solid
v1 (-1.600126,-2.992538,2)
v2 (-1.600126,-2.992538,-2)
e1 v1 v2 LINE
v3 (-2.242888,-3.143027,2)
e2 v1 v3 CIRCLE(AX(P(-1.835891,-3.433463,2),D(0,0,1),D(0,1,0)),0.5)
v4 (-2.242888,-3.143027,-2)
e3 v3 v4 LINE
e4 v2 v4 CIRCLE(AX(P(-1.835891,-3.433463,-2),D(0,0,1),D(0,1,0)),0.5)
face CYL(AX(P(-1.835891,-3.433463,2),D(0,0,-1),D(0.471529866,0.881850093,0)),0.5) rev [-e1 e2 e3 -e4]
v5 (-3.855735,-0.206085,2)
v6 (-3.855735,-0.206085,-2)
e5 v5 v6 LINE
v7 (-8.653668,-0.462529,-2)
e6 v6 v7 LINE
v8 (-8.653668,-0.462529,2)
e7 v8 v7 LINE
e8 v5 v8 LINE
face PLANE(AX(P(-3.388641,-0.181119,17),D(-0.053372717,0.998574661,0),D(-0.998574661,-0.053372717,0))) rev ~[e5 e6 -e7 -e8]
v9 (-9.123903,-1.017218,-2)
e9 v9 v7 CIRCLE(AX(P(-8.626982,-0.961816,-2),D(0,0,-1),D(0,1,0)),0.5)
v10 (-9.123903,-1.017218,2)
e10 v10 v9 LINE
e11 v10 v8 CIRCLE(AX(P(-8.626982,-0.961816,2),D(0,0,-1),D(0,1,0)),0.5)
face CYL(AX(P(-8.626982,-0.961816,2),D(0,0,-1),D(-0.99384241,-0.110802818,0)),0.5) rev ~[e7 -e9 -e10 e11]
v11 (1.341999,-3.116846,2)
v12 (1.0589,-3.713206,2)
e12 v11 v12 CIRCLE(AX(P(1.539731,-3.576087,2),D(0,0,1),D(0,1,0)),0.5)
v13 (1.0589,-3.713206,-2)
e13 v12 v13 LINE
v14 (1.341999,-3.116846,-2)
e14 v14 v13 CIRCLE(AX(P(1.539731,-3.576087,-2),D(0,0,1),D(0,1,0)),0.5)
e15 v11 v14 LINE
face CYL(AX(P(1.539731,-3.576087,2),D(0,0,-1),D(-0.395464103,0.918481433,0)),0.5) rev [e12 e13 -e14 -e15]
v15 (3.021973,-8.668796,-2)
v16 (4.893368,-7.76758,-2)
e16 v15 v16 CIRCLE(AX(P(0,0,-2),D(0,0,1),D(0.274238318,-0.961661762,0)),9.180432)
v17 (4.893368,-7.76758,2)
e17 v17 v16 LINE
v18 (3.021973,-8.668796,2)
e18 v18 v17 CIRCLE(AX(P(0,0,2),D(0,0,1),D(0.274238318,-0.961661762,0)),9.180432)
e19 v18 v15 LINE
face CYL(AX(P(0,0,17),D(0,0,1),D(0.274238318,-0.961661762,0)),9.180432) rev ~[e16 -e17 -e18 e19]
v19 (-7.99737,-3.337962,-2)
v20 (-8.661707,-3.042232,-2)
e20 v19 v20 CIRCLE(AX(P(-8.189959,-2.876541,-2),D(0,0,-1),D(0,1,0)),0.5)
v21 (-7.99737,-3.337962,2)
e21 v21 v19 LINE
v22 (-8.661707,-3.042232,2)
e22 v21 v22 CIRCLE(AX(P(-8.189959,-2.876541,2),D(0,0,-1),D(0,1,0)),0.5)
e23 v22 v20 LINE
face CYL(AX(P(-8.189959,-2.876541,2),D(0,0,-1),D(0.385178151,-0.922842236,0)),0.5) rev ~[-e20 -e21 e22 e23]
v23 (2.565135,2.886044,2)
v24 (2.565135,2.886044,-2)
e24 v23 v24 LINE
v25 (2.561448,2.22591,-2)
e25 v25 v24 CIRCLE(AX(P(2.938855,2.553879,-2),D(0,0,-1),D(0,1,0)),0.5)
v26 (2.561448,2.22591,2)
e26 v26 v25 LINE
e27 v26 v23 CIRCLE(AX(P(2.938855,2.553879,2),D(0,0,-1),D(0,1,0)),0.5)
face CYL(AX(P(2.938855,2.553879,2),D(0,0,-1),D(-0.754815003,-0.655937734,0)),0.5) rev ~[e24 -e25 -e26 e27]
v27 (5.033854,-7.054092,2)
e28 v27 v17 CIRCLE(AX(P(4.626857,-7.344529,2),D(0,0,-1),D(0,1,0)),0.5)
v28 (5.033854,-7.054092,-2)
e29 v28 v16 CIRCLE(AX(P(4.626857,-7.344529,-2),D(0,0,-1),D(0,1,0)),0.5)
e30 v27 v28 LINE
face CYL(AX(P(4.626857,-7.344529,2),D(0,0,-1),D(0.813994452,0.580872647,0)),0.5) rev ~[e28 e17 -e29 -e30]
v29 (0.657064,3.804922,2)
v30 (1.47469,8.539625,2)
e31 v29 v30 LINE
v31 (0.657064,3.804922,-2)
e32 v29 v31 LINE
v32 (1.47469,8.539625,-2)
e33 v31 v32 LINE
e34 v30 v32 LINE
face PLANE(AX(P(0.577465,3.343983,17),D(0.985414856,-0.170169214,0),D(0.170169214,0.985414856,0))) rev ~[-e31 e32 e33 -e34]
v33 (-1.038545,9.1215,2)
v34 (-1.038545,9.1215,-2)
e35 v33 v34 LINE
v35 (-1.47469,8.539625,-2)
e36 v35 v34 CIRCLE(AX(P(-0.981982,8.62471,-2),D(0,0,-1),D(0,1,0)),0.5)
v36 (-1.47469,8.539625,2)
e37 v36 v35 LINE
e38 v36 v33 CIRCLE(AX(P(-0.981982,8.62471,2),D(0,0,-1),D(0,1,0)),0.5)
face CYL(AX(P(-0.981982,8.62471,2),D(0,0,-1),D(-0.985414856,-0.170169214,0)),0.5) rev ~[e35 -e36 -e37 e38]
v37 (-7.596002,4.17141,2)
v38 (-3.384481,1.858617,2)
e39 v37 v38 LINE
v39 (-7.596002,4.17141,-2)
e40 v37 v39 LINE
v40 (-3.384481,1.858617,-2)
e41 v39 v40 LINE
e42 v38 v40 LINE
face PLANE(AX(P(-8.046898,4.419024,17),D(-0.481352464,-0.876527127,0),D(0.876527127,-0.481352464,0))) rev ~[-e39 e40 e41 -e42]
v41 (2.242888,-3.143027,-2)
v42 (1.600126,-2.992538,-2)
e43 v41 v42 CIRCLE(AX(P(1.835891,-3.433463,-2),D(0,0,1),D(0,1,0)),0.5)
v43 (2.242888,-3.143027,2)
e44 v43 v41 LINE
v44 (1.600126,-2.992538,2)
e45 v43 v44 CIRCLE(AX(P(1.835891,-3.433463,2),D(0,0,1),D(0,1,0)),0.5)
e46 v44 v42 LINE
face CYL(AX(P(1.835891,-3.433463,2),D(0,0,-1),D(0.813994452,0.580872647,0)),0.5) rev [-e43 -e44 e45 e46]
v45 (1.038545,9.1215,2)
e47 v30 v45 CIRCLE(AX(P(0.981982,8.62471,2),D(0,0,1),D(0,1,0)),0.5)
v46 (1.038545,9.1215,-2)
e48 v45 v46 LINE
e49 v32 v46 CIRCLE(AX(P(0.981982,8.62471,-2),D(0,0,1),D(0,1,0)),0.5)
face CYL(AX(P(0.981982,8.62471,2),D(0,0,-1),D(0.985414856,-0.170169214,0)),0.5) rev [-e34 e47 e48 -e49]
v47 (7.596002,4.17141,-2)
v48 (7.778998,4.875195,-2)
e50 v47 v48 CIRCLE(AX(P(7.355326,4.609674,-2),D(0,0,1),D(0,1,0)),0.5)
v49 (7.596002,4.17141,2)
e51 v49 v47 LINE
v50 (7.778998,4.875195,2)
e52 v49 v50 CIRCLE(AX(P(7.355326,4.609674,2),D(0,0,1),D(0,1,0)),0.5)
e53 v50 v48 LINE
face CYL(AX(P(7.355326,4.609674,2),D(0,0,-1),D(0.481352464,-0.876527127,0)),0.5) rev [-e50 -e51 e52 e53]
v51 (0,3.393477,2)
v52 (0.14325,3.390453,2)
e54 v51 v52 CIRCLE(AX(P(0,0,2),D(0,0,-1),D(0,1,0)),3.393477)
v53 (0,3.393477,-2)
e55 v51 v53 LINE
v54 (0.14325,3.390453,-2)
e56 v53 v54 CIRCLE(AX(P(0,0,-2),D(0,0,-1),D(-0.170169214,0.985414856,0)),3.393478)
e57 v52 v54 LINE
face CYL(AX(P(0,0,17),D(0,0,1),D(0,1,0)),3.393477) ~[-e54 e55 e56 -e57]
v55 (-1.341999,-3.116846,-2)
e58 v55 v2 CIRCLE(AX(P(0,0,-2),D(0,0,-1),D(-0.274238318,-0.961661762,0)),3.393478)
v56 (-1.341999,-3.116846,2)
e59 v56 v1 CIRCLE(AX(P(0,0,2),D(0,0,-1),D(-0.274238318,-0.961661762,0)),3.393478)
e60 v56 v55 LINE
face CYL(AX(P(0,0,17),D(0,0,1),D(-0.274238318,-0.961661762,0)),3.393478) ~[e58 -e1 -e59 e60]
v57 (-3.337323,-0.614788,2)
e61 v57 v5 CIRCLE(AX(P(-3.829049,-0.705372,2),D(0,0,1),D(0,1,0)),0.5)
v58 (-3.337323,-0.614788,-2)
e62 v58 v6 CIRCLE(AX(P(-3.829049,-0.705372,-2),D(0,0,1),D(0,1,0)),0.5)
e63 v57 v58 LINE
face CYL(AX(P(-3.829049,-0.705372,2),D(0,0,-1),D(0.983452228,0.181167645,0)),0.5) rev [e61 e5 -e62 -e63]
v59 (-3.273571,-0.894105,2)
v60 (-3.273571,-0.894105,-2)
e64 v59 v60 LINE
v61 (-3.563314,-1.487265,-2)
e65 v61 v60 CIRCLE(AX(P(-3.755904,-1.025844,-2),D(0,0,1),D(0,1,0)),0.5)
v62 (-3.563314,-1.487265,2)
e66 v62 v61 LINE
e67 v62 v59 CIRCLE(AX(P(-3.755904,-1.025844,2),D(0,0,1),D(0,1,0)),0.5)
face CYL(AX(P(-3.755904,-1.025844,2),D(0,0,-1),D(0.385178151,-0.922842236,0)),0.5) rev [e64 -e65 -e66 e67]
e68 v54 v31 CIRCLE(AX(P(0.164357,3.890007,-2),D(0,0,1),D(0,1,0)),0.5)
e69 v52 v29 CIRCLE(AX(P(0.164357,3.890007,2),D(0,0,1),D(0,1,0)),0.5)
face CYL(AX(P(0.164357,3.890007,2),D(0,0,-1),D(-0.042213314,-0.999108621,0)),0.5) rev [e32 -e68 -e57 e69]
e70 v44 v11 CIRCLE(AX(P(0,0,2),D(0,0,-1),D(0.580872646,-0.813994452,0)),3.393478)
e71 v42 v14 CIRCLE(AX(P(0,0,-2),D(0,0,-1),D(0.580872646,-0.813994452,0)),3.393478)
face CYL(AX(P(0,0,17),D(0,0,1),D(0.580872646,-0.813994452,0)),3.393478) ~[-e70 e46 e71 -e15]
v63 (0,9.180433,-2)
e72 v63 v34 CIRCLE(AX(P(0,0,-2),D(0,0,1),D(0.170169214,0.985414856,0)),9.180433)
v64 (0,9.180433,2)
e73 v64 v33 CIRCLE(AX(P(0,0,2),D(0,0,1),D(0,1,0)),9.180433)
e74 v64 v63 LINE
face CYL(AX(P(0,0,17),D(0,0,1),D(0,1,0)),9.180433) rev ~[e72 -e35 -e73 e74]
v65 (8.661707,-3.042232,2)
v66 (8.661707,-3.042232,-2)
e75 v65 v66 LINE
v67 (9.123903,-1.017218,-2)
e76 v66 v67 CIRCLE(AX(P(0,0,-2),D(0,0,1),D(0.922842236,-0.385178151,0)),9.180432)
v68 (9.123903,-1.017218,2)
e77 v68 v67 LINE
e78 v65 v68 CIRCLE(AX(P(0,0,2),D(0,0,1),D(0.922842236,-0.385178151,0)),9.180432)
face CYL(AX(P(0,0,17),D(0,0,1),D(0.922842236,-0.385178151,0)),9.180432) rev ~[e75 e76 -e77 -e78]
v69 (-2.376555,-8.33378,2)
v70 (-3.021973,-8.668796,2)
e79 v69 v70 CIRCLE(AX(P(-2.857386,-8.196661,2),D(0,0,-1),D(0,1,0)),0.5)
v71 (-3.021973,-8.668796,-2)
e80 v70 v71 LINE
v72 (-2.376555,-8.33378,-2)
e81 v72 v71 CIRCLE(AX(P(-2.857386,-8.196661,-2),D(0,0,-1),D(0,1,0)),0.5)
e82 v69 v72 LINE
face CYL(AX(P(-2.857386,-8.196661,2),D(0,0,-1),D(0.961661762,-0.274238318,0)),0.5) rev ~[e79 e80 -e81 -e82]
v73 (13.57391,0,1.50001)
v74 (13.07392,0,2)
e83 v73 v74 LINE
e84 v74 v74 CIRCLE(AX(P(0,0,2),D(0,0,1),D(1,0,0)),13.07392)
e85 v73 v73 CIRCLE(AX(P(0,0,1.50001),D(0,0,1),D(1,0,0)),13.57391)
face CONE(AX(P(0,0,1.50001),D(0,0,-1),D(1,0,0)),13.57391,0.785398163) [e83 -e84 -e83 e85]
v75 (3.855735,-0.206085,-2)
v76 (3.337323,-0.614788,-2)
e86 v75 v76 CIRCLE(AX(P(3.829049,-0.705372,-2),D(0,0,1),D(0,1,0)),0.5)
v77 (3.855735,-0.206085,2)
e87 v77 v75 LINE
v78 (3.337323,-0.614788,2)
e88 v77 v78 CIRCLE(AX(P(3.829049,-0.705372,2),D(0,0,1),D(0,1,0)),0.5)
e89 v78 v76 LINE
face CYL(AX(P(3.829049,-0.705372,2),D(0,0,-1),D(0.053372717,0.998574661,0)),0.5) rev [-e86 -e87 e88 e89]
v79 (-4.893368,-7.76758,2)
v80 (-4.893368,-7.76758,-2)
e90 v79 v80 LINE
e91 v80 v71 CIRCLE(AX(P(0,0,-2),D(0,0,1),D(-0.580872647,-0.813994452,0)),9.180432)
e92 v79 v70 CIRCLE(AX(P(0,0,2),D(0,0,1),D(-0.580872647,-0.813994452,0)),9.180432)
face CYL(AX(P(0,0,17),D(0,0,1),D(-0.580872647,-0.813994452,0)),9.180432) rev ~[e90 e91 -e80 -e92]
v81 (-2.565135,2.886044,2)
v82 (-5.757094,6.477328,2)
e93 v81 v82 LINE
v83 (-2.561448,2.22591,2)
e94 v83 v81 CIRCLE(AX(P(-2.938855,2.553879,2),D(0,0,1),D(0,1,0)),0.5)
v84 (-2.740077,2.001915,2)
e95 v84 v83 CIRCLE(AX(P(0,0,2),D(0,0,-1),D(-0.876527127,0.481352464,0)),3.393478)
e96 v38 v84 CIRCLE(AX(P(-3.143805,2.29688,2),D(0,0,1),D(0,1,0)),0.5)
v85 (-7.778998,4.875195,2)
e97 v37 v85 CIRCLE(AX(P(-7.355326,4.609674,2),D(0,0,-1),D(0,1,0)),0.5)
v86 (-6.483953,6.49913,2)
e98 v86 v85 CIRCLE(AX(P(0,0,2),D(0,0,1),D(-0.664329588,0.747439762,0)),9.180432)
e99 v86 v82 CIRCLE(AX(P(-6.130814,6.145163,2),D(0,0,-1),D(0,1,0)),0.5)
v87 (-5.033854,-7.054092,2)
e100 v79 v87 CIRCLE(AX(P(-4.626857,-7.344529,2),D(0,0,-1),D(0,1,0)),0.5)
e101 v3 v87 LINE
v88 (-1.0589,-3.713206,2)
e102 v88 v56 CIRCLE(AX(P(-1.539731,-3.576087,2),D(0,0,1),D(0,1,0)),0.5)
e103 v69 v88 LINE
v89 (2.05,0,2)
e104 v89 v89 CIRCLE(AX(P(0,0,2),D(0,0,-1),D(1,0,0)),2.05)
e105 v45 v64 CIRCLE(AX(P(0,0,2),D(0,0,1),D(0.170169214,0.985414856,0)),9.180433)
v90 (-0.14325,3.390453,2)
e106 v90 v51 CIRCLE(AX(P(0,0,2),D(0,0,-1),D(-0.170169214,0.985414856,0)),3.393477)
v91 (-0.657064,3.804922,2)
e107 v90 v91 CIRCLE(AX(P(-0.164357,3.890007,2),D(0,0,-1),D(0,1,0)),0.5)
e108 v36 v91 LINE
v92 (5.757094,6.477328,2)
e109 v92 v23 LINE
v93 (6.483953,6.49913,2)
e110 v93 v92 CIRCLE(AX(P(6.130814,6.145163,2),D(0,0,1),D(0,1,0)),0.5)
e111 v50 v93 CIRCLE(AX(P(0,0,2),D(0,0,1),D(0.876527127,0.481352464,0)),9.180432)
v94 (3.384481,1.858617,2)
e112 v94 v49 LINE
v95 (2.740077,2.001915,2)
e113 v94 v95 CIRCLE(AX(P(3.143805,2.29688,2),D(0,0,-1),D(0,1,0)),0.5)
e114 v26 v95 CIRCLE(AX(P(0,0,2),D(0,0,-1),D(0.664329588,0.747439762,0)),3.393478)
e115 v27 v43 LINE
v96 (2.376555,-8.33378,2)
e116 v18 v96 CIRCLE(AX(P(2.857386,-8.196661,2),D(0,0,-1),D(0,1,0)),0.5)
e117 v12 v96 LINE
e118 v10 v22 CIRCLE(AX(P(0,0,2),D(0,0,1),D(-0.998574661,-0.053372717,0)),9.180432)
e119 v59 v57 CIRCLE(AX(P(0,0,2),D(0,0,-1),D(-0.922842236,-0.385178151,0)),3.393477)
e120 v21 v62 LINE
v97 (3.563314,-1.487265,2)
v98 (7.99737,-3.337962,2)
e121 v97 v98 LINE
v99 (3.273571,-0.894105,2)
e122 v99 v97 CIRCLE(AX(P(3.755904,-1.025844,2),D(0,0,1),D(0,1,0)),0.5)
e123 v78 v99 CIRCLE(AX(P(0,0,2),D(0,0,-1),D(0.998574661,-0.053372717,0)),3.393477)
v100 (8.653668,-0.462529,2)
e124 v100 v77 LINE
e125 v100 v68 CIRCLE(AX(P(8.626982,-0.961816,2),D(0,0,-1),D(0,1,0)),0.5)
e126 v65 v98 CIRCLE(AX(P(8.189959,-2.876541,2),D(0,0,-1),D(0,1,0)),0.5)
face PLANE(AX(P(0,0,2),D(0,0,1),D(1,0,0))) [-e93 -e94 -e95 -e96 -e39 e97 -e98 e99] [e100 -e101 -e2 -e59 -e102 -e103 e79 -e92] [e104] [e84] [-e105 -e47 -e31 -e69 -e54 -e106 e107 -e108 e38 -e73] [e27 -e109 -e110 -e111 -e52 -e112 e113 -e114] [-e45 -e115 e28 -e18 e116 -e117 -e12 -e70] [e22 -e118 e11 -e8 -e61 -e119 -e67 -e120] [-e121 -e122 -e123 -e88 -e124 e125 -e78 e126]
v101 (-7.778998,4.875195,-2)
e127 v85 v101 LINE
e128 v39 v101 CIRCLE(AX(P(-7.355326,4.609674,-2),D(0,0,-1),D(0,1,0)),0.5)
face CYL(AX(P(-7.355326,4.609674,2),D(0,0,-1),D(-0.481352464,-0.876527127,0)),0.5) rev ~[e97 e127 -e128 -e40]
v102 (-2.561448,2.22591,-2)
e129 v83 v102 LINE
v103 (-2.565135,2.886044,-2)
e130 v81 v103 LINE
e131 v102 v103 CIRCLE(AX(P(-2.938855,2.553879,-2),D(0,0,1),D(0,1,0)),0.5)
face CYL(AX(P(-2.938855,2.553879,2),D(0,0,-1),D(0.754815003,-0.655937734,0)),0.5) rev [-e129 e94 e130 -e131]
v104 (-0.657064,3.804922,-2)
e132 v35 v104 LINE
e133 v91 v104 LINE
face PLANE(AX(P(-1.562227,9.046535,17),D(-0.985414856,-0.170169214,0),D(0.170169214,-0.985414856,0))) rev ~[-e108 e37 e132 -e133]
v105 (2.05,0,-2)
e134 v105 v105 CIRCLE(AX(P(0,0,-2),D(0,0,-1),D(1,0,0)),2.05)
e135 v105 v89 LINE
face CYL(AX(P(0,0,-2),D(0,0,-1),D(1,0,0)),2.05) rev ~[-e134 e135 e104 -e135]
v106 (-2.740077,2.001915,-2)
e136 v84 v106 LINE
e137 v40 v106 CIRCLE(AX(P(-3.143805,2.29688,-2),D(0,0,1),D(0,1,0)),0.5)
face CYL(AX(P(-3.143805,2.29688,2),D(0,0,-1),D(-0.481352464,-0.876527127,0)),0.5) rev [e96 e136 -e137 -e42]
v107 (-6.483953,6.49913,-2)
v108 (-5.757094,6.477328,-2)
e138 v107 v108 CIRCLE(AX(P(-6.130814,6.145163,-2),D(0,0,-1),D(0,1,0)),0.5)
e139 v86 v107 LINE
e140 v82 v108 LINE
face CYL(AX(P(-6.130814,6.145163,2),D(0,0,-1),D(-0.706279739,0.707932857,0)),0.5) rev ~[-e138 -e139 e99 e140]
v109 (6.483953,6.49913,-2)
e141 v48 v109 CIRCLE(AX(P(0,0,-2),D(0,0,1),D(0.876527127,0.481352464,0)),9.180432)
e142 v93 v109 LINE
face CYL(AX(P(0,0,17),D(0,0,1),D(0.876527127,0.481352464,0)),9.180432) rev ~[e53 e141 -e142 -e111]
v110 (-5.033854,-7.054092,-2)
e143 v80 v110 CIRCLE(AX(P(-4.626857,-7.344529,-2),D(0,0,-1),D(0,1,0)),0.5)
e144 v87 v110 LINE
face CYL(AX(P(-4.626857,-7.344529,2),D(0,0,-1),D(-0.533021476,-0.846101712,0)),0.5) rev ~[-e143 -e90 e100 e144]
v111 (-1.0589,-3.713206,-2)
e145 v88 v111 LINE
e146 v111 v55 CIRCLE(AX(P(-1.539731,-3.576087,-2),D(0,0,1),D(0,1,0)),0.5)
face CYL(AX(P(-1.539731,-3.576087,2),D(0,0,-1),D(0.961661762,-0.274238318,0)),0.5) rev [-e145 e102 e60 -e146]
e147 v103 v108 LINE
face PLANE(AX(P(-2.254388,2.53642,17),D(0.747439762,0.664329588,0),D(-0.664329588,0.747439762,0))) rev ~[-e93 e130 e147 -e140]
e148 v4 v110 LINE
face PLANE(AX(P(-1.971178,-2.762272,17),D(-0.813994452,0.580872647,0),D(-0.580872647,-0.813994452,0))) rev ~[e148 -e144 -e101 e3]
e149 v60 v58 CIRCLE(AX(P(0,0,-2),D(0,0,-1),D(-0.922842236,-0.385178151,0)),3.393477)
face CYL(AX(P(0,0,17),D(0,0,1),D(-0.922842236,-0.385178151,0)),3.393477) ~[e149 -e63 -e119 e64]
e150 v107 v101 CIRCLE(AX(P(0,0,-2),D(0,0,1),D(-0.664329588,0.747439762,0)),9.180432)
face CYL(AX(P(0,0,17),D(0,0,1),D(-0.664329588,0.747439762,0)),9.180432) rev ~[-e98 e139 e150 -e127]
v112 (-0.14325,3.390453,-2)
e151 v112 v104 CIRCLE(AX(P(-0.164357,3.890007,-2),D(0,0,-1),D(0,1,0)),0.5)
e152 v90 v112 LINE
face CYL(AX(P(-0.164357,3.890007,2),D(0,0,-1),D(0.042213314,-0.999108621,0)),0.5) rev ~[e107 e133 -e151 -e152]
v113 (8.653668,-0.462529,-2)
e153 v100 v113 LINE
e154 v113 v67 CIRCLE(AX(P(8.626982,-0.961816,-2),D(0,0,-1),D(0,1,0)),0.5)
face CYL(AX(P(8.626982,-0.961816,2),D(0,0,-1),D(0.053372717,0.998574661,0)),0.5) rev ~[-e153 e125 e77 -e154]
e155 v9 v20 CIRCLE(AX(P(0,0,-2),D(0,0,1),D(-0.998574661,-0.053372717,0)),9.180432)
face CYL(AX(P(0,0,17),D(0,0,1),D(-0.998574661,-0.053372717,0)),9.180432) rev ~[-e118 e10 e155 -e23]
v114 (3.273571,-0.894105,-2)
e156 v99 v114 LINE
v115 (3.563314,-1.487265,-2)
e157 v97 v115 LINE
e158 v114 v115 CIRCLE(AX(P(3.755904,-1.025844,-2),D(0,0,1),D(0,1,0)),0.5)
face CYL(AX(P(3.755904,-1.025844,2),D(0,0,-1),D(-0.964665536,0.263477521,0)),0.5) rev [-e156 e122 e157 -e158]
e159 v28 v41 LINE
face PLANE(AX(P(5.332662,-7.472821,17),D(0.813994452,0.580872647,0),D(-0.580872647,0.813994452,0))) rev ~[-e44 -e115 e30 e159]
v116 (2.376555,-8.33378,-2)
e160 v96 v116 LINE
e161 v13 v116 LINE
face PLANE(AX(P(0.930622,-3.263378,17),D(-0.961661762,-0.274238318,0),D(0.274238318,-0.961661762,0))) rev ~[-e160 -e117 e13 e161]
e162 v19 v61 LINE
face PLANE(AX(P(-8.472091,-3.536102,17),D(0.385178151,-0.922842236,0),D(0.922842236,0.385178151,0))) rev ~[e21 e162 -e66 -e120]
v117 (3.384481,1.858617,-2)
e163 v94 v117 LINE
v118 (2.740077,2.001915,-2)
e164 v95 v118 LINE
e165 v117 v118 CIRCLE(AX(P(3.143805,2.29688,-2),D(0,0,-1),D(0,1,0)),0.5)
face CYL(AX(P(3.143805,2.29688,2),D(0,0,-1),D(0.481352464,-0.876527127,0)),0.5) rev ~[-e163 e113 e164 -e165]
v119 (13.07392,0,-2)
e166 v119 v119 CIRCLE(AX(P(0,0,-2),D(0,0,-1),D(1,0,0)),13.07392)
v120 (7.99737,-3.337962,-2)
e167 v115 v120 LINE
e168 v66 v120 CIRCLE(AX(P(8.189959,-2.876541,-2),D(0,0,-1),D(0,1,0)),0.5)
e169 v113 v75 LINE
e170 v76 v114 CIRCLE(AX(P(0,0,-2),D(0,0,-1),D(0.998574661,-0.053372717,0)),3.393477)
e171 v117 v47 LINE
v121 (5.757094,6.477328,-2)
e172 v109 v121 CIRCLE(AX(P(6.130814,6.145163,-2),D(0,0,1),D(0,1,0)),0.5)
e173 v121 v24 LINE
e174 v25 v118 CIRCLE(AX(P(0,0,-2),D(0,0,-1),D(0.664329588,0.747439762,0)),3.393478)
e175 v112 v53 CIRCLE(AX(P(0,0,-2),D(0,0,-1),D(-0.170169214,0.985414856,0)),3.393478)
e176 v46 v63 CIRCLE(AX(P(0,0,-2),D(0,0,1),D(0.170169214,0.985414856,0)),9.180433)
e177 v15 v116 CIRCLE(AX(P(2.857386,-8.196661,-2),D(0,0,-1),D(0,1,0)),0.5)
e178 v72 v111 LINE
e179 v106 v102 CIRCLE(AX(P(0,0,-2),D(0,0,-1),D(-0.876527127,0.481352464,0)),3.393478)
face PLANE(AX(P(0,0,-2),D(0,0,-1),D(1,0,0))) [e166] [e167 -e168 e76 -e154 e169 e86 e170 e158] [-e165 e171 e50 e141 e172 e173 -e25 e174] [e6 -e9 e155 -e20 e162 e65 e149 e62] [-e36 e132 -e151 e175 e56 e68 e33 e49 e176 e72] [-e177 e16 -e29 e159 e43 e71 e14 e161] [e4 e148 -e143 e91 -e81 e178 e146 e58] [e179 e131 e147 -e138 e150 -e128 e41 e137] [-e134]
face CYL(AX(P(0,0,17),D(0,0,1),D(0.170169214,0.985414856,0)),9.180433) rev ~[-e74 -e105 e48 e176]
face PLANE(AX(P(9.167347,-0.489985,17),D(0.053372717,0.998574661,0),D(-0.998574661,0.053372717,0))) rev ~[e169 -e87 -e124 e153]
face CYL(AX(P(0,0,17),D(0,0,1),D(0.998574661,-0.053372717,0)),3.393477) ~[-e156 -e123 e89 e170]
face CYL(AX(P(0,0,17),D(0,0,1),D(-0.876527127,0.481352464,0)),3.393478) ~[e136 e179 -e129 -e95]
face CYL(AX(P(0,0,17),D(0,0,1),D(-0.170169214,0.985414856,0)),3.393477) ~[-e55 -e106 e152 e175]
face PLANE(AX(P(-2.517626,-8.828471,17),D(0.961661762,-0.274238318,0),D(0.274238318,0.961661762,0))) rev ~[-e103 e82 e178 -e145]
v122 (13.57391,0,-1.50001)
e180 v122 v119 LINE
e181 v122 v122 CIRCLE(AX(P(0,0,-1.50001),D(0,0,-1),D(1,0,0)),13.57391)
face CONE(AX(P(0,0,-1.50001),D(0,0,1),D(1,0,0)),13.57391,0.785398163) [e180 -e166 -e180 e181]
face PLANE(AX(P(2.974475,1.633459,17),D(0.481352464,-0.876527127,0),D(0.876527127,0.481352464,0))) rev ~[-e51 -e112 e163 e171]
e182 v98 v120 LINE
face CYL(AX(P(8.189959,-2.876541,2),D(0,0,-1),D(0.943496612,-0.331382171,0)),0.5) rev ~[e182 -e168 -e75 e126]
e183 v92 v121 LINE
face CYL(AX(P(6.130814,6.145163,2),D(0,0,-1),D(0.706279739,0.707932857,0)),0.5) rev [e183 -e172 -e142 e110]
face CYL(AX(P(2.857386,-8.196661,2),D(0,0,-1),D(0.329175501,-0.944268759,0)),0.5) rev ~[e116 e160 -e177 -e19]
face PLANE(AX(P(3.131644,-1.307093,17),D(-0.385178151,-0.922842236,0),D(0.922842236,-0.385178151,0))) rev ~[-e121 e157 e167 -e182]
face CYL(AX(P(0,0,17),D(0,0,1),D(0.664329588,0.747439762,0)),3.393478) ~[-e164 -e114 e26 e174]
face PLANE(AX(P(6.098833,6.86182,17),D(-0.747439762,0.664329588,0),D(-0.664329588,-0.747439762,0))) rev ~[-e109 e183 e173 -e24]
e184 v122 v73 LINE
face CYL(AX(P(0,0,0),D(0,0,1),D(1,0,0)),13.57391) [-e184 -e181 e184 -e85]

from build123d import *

# Parameters (mm, degrees)
F0_R      = 13.57391
F1_DEPTH  = 17
F3_DEPTH  = 1.5
F5_DEPTH  = 34
F6_R      = 15.57391
F6_R_2    = 13.57391
F7_DEPTH  = 1.5
F8_SIZE2  = 0.99999
F8_SIZE   = 1.99999
F9_R      = 1
F12_R     = 13.57391
F12_R_2   = 10.57391
F13_DEPTH = 2
F15_R     = 13.57391
F15_R_2   = 10.57391
F16_DEPTH = 2
F17_SIZE  = 0.49999
F18_R     = 19.7740128031
F18_R_2   = 13.57391
F19_DEPTH = 100
F20_DEPTH = 15
F10_R     = 13.57391
F10_R_2   = 10.32391
F21_DEPTH = 15
F22_R     = 2.05
F23_DEPTH = 25
F24_R     = 0.5


# Not quite as in the source:
# - a fillet or chamfer is up to 0.001 mm smaller than in the source, because OpenCascade refuses the exact size
# - a feature names something its author has since deleted; it is built from what else it names


with BuildPart() as f1:
    # F0 (on Top) → F1 (new body, symmetric)
    with BuildSketch(Plane.XY):
        Circle(F0_R)
    extrude(amount=F1_DEPTH, both=True)

    # F2 (on Top) → F3 (join, symmetric)
    with BuildSketch(Plane.XY):
        with BuildLine():
            Line((-8.8722387473, 10.27299432), (-13.094084175, 11.721231689))
            ThreePointArc((-13.094084175, 11.721231689), (-13.7398361081, 10.9571536638), (-14.3410637787, 10.1575687241))
            Line((-14.3410637787, 10.1575687241), (-11.9896877566, 6.3638369077))
            ThreePointArc((-11.9896877566, 6.3638369077), (-10.6125101782, 8.4631944563), (-8.8722387473, 10.27299432))
        make_face()
        with BuildLine():
            ThreePointArc((1, 17.5454356654), (0, 17.57391), (-1, 17.5454356654))
            Line((-1, 17.5454356654), (-2.5, 13.3417027657))
            ThreePointArc((-2.5, 13.3417027657), (0, 13.57391), (2.5, 13.3417027657))
            Line((2.5, 13.3417027657), (1, 17.5454356654))
        make_face()
        with BuildLine():
            Line((11.9896877566, 6.3638369077), (14.3410637787, 10.1575687241))
            ThreePointArc((14.3410637787, 10.1575687241), (13.7398361081, 10.9571536638), (13.094084175, 11.721231689))
            Line((13.094084175, 11.721231689), (8.8722387473, 10.27299432))
            ThreePointArc((8.8722387473, 10.27299432), (10.6125101782, 8.4631944563), (11.9896877566, 6.3638369077))
        make_face()
        with BuildLine():
            Line((12.4508960874, -5.4061279404), (16.8830140276, -4.8791546431))
            ThreePointArc((16.8830140276, -4.8791546431), (17.1332953852, -3.9105628665), (17.3280558955, -2.9292988187))
            Line((17.3280558955, -2.9292988187), (13.5635007572, -0.5314883795))
            ThreePointArc((13.5635007572, -0.5314883795), (13.2335837364, -3.0204791306), (12.4508960874, -5.4061279404))
        make_face()
        with BuildLine():
            Line((3.5363257124, -13.1051681845), (6.711710363, -16.2417750474))
            ThreePointArc((6.711710363, -16.2417750474), (7.6250337817, -15.8335457973), (8.5136480988, -15.3740075692))
            Line((8.5136480988, -15.3740075692), (8.0411700519, -10.9357494889))
            ThreePointArc((8.0411700519, -10.9357494889), (5.8894988252, -12.2296703257), (3.5363257124, -13.1051681845))
        make_face()
        with BuildLine():
            Line((-8.0411700519, -10.9357494889), (-8.5136480988, -15.3740075692))
            ThreePointArc((-8.5136480988, -15.3740075692), (-7.6250337817, -15.8335457973), (-6.711710363, -16.2417750474))
            Line((-6.711710363, -16.2417750474), (-3.5363257124, -13.1051681845))
            ThreePointArc((-3.5363257124, -13.1051681845), (-5.8894988252, -12.2296703257), (-8.0411700519, -10.9357494889))
        make_face()
        with BuildLine():
            Line((-13.5635007572, -0.5314883795), (-17.3280558955, -2.9292988187))
            ThreePointArc((-17.3280558955, -2.9292988187), (-17.1332953852, -3.9105628665), (-16.8830140276, -4.8791546431))
            Line((-16.8830140276, -4.8791546431), (-12.4508960874, -5.4061279404))
            ThreePointArc((-12.4508960874, -5.4061279404), (-13.2335837364, -3.0204791306), (-13.5635007572, -0.5314883795))
        make_face()
    extrude(amount=F3_DEPTH, both=True)

    # F4 (on face) → F5 (cut)
    with BuildSketch(Plane.XY.offset(17)):
        with BuildLine():
            ThreePointArc((-0.5774653997, 3.3439831422), (-0.2897912953, 3.3810812691), (0, 3.3934775))
            Line((0, 3.3934775), (0, 6.786955))
            Line((0, 6.786955), (0, 9.1804325))
            ThreePointArc((0, 9.1804325), (-0.7839773287, 9.1468967653), (-1.5622269849, 9.0465345705))
            Line((-1.5622269849, 9.0465345705), (-0.5774653997, 3.3439831422))
        make_face()
        with BuildLine():
            Line((0, 6.786955), (0, 3.3934775))
            ThreePointArc((0, 3.3934775), (0.2897912953, 3.3810812691), (0.5774653997, 3.3439831422))
            Line((0.5774653997, 3.3439831422), (1.5622269849, 9.0465345705))
            ThreePointArc((1.5622269849, 9.0465345705), (0.7839773287, 9.1468967653), (0, 9.1804325))
            Line((0, 9.1804325), (0, 6.786955))
        make_face()
        Polygon((-1.2990381057, 0.7133780277), (0, 0), (-0.8810810246, 0.9913076333), (-1.2990381057, 0.75), align=None)
        Polygon((-0.8810810246, 0.9913076333), (0, 0), (-0.2355474293, 1.3640066283), align=None)
        Polygon((-0.2355474293, 1.3640066283), (0, 0), (0, 1.5), align=None)
        Polygon((0, 1.5), (0, 0), (0.2355474293, 1.3640066283), align=None)
        Polygon((0.2355474293, 1.3640066283), (0, 0), (0.8810810246, 0.9913076333), align=None)
        Polygon((0.8810810246, 0.9913076333), (0, 0), (1.2990381057, 0.7133780277), (1.2990381057, 0.75), align=None)
        Polygon((1.2990381057, -0.5421957037), (0, 0), (0.7580809189, -1.0623217774), (1.2990381057, -0.75), align=None)
        Polygon((0.3672856493, -1.2879475315), (0, 0), (-0.3672856493, -1.2879475315), (0, -1.5), align=None)
        Polygon((-0.7580809189, -1.0623217774), (0, 0), (-1.2990381057, -0.5421957037), (-1.2990381057, -0.75), align=None)
        with BuildLine():
            Line((-8.0468981277, 4.4190238073), (-2.974475085, 1.6334587572))
            ThreePointArc((-2.974475085, 1.6334587572), (-2.6531275445, 2.1157986141), (-2.2543875098, 2.5364200163))
            Line((-2.2543875098, 2.5364200163), (-6.0988329412, 6.8618202864))
            ThreePointArc((-6.0988329412, 6.8618202864), (-7.1775511512, 5.7239060404), (-8.0468981277, 4.4190238073))
        make_face()
        with BuildLine():
            Line((6.0988329412, 6.8618202864), (2.2543875098, 2.5364200163))
            ThreePointArc((2.2543875098, 2.5364200163), (2.6531275445, 2.1157986141), (2.974475085, 1.6334587572))
            Line((2.974475085, 1.6334587572), (8.0468981277, 4.4190238073))
            ThreePointArc((8.0468981277, 4.4190238073), (7.1775511512, 5.7239060404), (6.0988329412, 6.8618202864))
        make_face()
        with BuildLine():
            Line((9.167347269, -0.489984629), (3.3886406432, -0.1811191154))
            ThreePointArc((3.3886406432, -0.1811191154), (3.3083959341, -0.7551197827), (3.1316443631, -1.3070933884))
            Line((3.1316443631, -1.3070933884), (8.4720908536, -3.5361020144))
            ThreePointArc((8.4720908536, -3.5361020144), (8.9502598902, -2.042838414), (9.167347269, -0.489984629))
        make_face()
        with BuildLine():
            Line((-8.4720908536, -3.5361020144), (-3.1316443631, -1.3070933884))
            ThreePointArc((-3.1316443631, -1.3070933884), (-3.3083959341, -0.7551197827), (-3.3886406432, -0.1811191154))
            Line((-3.3886406432, -0.1811191154), (-9.167347269, -0.489984629))
            ThreePointArc((-9.167347269, -0.489984629), (-8.9502598902, -2.042838414), (-8.4720908536, -3.5361020144))
        make_face()
        with BuildLine():
            Line((-2.5176263675, -8.8284708959), (-0.9306215619, -3.2633775527))
            ThreePointArc((-0.9306215619, -3.2633775527), (-1.4723747063, -3.0574175814), (-1.9711782567, -2.7622718591))
            Line((-1.9711782567, -2.7622718591), (-5.3326621235, -7.4728211249))
            ThreePointArc((-5.3326621235, -7.4728211249), (-3.9832403798, -8.2712838764), (-2.5176263675, -8.8284708959))
        make_face()
        with BuildLine():
            Line((5.3326621235, -7.4728211249), (1.9711782567, -2.7622718591))
            ThreePointArc((1.9711782567, -2.7622718591), (1.4723747063, -3.0574175814), (0.9306215619, -3.2633775527))
            Line((0.9306215619, -3.2633775527), (2.5176263675, -8.8284708959))
            ThreePointArc((2.5176263675, -8.8284708959), (3.9832403798, -8.2712838764), (5.3326621235, -7.4728211249))
        make_face()
    extrude(amount=-F5_DEPTH, mode=Mode.SUBTRACT)

    # F6 (on face) → F7 (join)
    with BuildSketch(Plane(origin=(0, 0, -17), x_dir=(1, 0, 0), z_dir=(0, 0, -1))):
        Circle(F6_R)
        Circle(F6_R_2, mode=Mode.SUBTRACT)
    extrude(amount=-F7_DEPTH)

    # F8 (size 2 and 1 in the source; OpenCascade refuses exactly that, so slightly less here)
    f8_edges = [f1.edges().sort_by_distance(p)[0] for p in [
        (-15.57391, 0, -15.5),
    ]]
    f8_side = f1.faces().sort_by_distance((-15.133413, 0, -15.5))[0]
    chamfer(f8_edges, length=F8_SIZE, length2=F8_SIZE2, reference=f8_side)

    # F9
    f9_edges = [f1.edges().sort_by_distance(p)[0] for p in [
        (14.341064, 10.157569, 0),
        (13.094084, 11.721232, 0),
        (1, 17.545436, 0),
        (-1, 17.545436, 0),
        (-13.094084, 11.721232, 0),
        (-14.341064, 10.157569, 0),
        (-17.328056, -2.929299, 0),
        (-16.883014, -4.879155, 0),
        (-8.513648, -15.374008, 0),
        (-6.71171, -16.241775, 0),
        (6.71171, -16.241775, 0),
        (8.513648, -15.374008, 0),
        (16.883014, -4.879155, 0),
        (17.328056, -2.929299, 0),
    ]]
    fillet(f9_edges, radius=F9_R)

    # F12 (on offset) → F13 (cut)
    with BuildSketch(Plane.XY.offset(2)):
        Circle(F12_R)
        Circle(F12_R_2, mode=Mode.SUBTRACT)
    extrude(amount=F13_DEPTH, mode=Mode.SUBTRACT)

    # F15 (on offset) → F16 (cut)
    with BuildSketch(Plane(origin=(0, 0, -2), x_dir=(1, 0, 0), z_dir=(0, 0, -1))):
        Circle(F15_R)
        Circle(F15_R_2, mode=Mode.SUBTRACT)
    extrude(amount=F16_DEPTH, mode=Mode.SUBTRACT)

    # F17 (size 0.5 in the source; OpenCascade refuses exactly that, so slightly less here)
    f17_edges = [f1.edges().sort_by_distance(p)[0] for p in [
        (-13.57391, 0, -4),
        (-13.57391, 0, -2),
        (-13.57391, 0, 2),
        (-13.57391, 0, 4),
    ]]
    chamfer(f17_edges, length=F17_SIZE)

    # F18 (on face) → F19 (cut)
    with BuildSketch(Plane.XY.offset(17)):
        Circle(F18_R)
        Circle(F18_R_2, mode=Mode.SUBTRACT)
    extrude(amount=-F19_DEPTH, mode=Mode.SUBTRACT)

    # F20 (cut): a face of the model
    f20_faces = [f1.faces().sort_by_distance(p)[0] for p in [
        (-13.1899818477, 0, 17),
    ]]
    extrude(f20_faces, amount=-F20_DEPTH, mode=Mode.SUBTRACT)

    # F10 (on face) → F21 (cut)
    with BuildSketch(Plane(origin=(0, 0, -17), x_dir=(1, 0, 0), z_dir=(0, 0, -1))):
        Circle(F10_R)
        Circle(F10_R_2, mode=Mode.SUBTRACT)
        Circle(F10_R_2)
        with BuildLine():
            Line((-2.2543875098, -2.5364200163), (-6.0988329412, -6.8618202864))
            ThreePointArc((-6.0988329412, -6.8618202864), (-7.1775511512, -5.7239060404), (-8.0468981277, -4.4190238073))
            Line((-8.0468981277, -4.4190238073), (-2.974475085, -1.6334587572))
            ThreePointArc((-2.974475085, -1.6334587572), (-2.6531275445, -2.1157986141), (-2.2543875098, -2.5364200163))
        make_face(mode=Mode.SUBTRACT)
        with BuildLine():
            ThreePointArc((-0.5774653997, -3.3439831422), (0, -3.3934775), (0.5774653997, -3.3439831422))
            Line((0.5774653997, -3.3439831422), (1.5622269849, -9.0465345705))
            ThreePointArc((1.5622269849, -9.0465345705), (0, -9.1804325), (-1.5622269849, -9.0465345705))
            Line((-1.5622269849, -9.0465345705), (-0.5774653997, -3.3439831422))
        make_face(mode=Mode.SUBTRACT)
        with BuildLine():
            ThreePointArc((8.0468981277, -4.4190238073), (7.1775511512, -5.7239060404), (6.0988329412, -6.8618202864))
            Line((6.0988329412, -6.8618202864), (2.2543875098, -2.5364200163))
            ThreePointArc((2.2543875098, -2.5364200163), (2.6531275445, -2.1157986141), (2.974475085, -1.6334587572))
            Line((2.974475085, -1.6334587572), (8.0468981277, -4.4190238073))
        make_face(mode=Mode.SUBTRACT)
        Polygon((-1.2990381057, -0.7133780277), (0, 0), (1.2990381057, -0.7133780277), (1.2990381057, -0.75), (0, -1.5), (-1.2990381057, -0.75), align=None, mode=Mode.SUBTRACT)
        with BuildLine():
            Line((-3.3886406432, 0.1811191154), (-9.167347269, 0.489984629))
            ThreePointArc((-9.167347269, 0.489984629), (-8.9502598902, 2.042838414), (-8.4720908536, 3.5361020144))
            Line((-8.4720908536, 3.5361020144), (-3.1316443631, 1.3070933884))
            ThreePointArc((-3.1316443631, 1.3070933884), (-3.3083959341, 0.7551197827), (-3.3886406432, 0.1811191154))
        make_face(mode=Mode.SUBTRACT)
        Polygon((-0.7580809189, 1.0623217774), (0, 0), (-1.2990381057, 0.5421957037), (-1.2990381057, 0.75), align=None, mode=Mode.SUBTRACT)
        with BuildLine():
            Line((-1.9711782567, 2.7622718591), (-5.3326621235, 7.4728211249))
            ThreePointArc((-5.3326621235, 7.4728211249), (-3.9832403798, 8.2712838764), (-2.5176263675, 8.8284708959))
            Line((-2.5176263675, 8.8284708959), (-0.9306215619, 3.2633775527))
            ThreePointArc((-0.9306215619, 3.2633775527), (-1.4723747063, 3.0574175814), (-1.9711782567, 2.7622718591))
        make_face(mode=Mode.SUBTRACT)
        Polygon((0.3672856493, 1.2879475315), (0, 0), (-0.3672856493, 1.2879475315), (0, 1.5), align=None, mode=Mode.SUBTRACT)
        Polygon((1.2990381057, 0.5421957037), (0, 0), (0.7580809189, 1.0623217774), (1.2990381057, 0.75), align=None, mode=Mode.SUBTRACT)
        with BuildLine():
            Line((3.1316443631, 1.3070933884), (8.4720908536, 3.5361020144))
            ThreePointArc((8.4720908536, 3.5361020144), (8.9502598902, 2.042838414), (9.167347269, 0.489984629))
            Line((9.167347269, 0.489984629), (3.3886406432, 0.1811191154))
            ThreePointArc((3.3886406432, 0.1811191154), (3.3083959341, 0.7551197827), (3.1316443631, 1.3070933884))
        make_face(mode=Mode.SUBTRACT)
        with BuildLine():
            Line((0.9306215619, 3.2633775527), (2.5176263675, 8.8284708959))
            ThreePointArc((2.5176263675, 8.8284708959), (3.9832403798, 8.2712838764), (5.3326621235, 7.4728211249))
            Line((5.3326621235, 7.4728211249), (1.9711782567, 2.7622718591))
            ThreePointArc((1.9711782567, 2.7622718591), (1.4723747063, 3.0574175814), (0.9306215619, 3.2633775527))
        make_face(mode=Mode.SUBTRACT)
    extrude(amount=-F21_DEPTH, mode=Mode.SUBTRACT)

    # F22 (on face) → F23 (cut)
    with BuildSketch(Plane(origin=(0, 0, -2), x_dir=(1, 0, 0), z_dir=(0, 0, -1))):
        Circle(F22_R)
        Polygon((-1.2990381057, -0.7133780277), (0, 0), (1.2990381057, -0.7133780277), (1.2990381057, -0.75), (0, -1.5), (-1.2990381057, -0.75), align=None, mode=Mode.SUBTRACT)
        Polygon((-0.7580809189, 1.0623217774), (0, 0), (-1.2990381057, 0.5421957037), (-1.2990381057, 0.75), align=None, mode=Mode.SUBTRACT)
        Polygon((0.3672856493, 1.2879475315), (0, 0), (-0.3672856493, 1.2879475315), (0, 1.5), align=None, mode=Mode.SUBTRACT)
        Polygon((1.2990381057, 0.5421957037), (0, 0), (0.7580809189, 1.0623217774), (1.2990381057, 0.75), align=None, mode=Mode.SUBTRACT)
    extrude(amount=-F23_DEPTH, mode=Mode.SUBTRACT)

    # F24
    f24_edges = [f1.edges().sort_by_distance(p)[0] for p in [
        (-1.971178, -2.762272, 0),
        (-0.930622, -3.263378, 0),
        (1.971178, -2.762272, 0),
        (0.930622, -3.263378, 0),
        (3.388641, -0.181119, 0),
        (3.131644, -1.307093, 0),
        (2.254388, 2.53642, 0),
        (2.974475, 1.633459, 0),
        (-0.577465, 3.343983, 0),
        (0.577465, 3.343983, 0),
        (-2.254388, 2.53642, 0),
        (-2.974475, 1.633459, 0),
        (-3.388641, -0.181119, 0),
        (-3.131644, -1.307093, 0),
        (-9.167347, -0.489985, 0),
        (-8.472091, -3.536102, 0),
        (-8.046898, 4.419024, 0),
        (-6.098833, 6.86182, 0),
        (-1.562227, 9.046535, 0),
        (1.562227, 9.046535, 0),
        (6.098833, 6.86182, 0),
        (8.046898, 4.419024, 0),
        (9.167347, -0.489985, 0),
        (8.472091, -3.536102, 0),
        (5.332662, -7.472821, 0),
        (2.517626, -8.828471, 0),
        (-2.517626, -8.828471, 0),
        (-5.332662, -7.472821, 0),
    ]]
    fillet(f24_edges, radius=F24_R)


solid = f1.part
